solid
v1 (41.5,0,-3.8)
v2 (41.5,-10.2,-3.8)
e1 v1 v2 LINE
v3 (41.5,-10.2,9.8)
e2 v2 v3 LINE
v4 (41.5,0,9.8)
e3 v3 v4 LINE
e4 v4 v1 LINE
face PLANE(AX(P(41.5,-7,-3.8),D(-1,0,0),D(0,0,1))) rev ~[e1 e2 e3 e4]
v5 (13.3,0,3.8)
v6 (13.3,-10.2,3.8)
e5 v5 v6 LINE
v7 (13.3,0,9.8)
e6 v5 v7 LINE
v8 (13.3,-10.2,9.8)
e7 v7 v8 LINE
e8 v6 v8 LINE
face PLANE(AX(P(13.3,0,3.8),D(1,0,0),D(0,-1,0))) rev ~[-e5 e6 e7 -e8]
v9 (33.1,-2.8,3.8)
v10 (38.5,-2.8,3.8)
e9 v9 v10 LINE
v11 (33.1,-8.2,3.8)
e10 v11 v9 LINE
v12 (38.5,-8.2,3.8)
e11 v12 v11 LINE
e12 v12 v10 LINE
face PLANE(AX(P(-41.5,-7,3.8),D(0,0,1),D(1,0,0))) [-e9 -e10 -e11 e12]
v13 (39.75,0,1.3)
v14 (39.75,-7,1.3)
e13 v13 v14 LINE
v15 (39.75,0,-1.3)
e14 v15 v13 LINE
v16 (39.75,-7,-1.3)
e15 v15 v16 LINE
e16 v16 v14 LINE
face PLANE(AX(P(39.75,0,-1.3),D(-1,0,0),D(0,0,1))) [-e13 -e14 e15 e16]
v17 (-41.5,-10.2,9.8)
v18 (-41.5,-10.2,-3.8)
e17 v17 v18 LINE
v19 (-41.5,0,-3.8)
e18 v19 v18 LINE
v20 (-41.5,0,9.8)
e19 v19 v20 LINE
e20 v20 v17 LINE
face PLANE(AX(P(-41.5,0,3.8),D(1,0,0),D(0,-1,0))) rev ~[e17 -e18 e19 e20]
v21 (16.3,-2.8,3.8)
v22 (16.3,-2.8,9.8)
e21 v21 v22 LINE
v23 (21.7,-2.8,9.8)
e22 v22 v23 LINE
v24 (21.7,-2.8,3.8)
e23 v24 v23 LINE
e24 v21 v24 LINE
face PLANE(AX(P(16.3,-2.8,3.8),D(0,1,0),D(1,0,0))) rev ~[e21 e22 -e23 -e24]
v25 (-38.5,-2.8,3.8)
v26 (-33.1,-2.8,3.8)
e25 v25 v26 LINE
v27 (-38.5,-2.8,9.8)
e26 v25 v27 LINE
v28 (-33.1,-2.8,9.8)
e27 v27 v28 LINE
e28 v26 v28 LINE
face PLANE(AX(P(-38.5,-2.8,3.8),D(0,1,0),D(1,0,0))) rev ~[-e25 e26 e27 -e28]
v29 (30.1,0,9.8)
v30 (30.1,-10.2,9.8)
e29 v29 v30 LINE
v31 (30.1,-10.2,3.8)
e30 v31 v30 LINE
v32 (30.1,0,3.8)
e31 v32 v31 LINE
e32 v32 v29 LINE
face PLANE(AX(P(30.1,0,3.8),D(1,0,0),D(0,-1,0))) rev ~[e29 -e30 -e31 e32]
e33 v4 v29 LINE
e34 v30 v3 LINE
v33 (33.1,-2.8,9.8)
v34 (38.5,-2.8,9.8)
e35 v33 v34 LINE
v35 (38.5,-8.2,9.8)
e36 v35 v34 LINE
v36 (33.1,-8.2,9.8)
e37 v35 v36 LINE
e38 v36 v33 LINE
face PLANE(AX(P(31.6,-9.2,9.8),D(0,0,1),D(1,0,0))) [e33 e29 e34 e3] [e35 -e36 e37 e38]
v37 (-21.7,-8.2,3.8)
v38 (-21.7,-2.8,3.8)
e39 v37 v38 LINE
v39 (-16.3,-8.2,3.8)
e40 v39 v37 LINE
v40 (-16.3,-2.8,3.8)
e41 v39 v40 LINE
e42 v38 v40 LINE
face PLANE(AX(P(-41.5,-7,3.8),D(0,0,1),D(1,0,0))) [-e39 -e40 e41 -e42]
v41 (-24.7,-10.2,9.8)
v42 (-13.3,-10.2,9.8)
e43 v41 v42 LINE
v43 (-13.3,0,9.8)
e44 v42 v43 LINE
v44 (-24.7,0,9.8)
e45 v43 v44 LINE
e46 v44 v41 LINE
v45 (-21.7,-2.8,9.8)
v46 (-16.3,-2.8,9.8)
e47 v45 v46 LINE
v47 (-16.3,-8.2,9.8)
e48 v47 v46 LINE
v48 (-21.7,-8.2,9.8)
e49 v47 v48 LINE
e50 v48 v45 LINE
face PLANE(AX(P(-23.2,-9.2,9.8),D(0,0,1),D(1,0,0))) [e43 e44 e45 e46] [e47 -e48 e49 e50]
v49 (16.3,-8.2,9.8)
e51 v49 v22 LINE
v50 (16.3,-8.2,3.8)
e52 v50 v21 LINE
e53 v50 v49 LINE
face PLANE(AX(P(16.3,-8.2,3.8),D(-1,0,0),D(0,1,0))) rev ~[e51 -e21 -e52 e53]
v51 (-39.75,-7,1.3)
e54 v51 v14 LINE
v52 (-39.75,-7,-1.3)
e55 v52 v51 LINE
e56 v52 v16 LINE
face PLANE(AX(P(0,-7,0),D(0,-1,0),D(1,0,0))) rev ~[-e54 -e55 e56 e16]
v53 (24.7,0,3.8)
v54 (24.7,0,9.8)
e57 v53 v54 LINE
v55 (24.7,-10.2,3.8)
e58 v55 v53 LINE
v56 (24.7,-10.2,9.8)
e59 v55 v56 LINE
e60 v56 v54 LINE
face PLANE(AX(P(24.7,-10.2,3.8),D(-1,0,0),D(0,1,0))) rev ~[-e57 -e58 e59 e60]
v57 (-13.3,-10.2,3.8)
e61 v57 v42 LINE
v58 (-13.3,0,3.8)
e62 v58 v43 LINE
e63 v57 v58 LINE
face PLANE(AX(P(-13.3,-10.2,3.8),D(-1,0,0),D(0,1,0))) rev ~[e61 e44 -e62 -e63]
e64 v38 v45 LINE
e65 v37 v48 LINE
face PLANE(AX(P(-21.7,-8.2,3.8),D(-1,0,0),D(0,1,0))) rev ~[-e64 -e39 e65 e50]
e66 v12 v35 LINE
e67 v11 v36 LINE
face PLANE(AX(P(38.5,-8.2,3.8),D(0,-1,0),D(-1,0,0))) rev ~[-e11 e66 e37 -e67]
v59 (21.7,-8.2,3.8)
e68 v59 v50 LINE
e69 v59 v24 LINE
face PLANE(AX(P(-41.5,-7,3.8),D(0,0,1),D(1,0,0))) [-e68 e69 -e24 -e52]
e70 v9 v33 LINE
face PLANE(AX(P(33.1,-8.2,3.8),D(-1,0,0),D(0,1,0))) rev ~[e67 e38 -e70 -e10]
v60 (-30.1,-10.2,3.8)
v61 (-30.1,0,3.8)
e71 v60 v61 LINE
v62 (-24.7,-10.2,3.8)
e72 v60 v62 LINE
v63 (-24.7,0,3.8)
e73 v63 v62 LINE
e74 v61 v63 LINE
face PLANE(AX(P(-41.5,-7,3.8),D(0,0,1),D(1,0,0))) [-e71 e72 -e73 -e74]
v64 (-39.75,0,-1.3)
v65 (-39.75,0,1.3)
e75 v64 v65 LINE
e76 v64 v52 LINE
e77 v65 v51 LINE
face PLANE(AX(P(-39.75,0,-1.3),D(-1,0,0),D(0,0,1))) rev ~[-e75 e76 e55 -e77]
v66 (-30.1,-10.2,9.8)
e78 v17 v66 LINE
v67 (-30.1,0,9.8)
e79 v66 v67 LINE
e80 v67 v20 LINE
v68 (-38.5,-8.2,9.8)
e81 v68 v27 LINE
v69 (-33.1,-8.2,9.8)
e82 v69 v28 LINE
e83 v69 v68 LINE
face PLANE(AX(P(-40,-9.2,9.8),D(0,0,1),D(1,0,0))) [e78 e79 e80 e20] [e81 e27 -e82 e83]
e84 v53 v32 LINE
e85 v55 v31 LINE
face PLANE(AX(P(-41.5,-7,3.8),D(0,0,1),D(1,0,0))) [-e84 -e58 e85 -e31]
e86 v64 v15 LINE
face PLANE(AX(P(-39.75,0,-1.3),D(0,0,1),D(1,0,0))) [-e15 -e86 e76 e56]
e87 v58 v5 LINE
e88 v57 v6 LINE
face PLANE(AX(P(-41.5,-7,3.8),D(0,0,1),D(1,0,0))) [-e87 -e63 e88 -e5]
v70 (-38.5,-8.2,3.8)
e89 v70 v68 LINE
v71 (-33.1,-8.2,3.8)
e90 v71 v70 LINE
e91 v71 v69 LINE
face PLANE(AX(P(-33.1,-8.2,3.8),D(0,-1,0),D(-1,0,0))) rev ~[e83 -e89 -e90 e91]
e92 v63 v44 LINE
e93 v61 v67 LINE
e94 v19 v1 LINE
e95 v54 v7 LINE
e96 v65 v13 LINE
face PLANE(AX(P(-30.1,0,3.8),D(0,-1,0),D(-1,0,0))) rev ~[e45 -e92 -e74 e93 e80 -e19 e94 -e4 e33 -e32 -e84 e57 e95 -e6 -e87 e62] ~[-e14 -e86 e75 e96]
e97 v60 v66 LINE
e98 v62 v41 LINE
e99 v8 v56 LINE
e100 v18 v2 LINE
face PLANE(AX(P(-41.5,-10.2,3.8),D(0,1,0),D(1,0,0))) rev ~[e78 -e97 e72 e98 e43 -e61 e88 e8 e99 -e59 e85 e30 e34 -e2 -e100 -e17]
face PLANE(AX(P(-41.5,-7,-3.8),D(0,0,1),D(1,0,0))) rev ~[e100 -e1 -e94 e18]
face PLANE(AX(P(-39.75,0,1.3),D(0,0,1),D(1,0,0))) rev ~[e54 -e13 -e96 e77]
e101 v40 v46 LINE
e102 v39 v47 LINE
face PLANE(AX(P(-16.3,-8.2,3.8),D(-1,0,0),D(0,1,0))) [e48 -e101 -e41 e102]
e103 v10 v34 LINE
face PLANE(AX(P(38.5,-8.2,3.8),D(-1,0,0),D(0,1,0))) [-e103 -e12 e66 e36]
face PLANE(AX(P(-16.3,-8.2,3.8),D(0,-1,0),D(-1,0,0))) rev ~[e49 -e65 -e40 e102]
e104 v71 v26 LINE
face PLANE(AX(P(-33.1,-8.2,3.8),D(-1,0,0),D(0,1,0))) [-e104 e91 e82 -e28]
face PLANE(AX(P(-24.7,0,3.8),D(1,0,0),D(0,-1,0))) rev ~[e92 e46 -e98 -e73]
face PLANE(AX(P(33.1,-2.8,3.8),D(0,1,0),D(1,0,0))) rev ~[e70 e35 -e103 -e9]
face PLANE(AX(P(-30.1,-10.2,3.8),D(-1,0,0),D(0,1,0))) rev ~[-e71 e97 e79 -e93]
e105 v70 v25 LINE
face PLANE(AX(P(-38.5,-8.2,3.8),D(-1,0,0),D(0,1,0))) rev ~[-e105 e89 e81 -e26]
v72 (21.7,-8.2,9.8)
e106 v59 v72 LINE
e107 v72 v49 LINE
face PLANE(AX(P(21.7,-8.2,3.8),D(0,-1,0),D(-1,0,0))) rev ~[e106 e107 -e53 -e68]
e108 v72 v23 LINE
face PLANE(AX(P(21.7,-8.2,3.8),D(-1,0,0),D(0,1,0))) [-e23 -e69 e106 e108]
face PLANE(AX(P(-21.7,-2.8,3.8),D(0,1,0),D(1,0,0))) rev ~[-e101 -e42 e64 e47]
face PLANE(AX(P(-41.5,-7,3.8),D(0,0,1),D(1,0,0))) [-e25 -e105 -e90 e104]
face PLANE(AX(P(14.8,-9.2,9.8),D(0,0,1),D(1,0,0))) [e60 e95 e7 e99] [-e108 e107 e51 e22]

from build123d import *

# Parameters (mm, degrees)
F0_W     = 83
F0_H     = 7.6
F0_W_2   = 79.5
F0_H_2   = 2.6
F1_DEPTH = 7
F2_W     = 83
F2_H     = 7.6
F2_W_2   = 79.5
F2_H_2   = 2.6
F3_DEPTH = 3.2
F4_W     = 3
F4_H     = 2
F4_W_2   = 5.4
F4_H_2   = 5.4
F4_H_3   = 2.8
F5_DEPTH = 6


with BuildPart() as f1:
    # F0 (on Front) → F1 (new body)
    with BuildSketch(Plane.XZ):
        Rectangle(F0_W, F0_H)
        Rectangle(F0_W_2, F0_H_2, mode=Mode.SUBTRACT)
    extrude(amount=F1_DEPTH)

    # F2 (on face) → F3 (join)
    with BuildSketch(Plane.XZ.offset(7)):
        Rectangle(F2_W, F2_H)
        Rectangle(F2_W_2, F2_H_2, mode=Mode.SUBTRACT)
        Rectangle(F2_W_2, F2_H_2)
    extrude(amount=F3_DEPTH)

    # F4 (on face) → F5 (join)
    with BuildSketch(Plane.XY.offset(3.8)):
        with Locations((-40, -9.2)):
            Rectangle(F4_W, F4_H)
        with Locations((-35.8, -9.2)):
            Rectangle(F4_W_2, F4_H)
        with Locations((-40, -5.5)):
            Rectangle(F4_W, F4_H_2)
        with Locations((-31.6, -9.2)):
            Rectangle(F4_W, F4_H)
        with Locations((-40, -1.4)):
            Rectangle(F4_W, F4_H_3)
        with Locations((-31.6, -5.5)):
            Rectangle(F4_W, F4_H_2)
        with Locations((-35.8, -1.4)):
            Rectangle(F4_W_2, F4_H_3)
        with Locations((-23.2, -9.2)):
            Rectangle(F4_W, F4_H)
        with Locations((-31.6, -1.4)):
            Rectangle(F4_W, F4_H_3)
        with Locations((-19, -9.2)):
            Rectangle(F4_W_2, F4_H)
        with Locations((-23.2, -5.5)):
            Rectangle(F4_W, F4_H_2)
        with Locations((-14.8, -9.2)):
            Rectangle(F4_W, F4_H)
        with Locations((-23.2, -1.4)):
            Rectangle(F4_W, F4_H_3)
        with Locations((-14.8, -5.5)):
            Rectangle(F4_W, F4_H_2)
        with Locations((-19, -1.4)):
            Rectangle(F4_W_2, F4_H_3)
        with Locations((-14.8, -1.4)):
            Rectangle(F4_W, F4_H_3)
        with Locations((14.8, -9.2)):
            Rectangle(F4_W, F4_H)
        with Locations((19, -9.2)):
            Rectangle(F4_W_2, F4_H)
        with Locations((14.8, -5.5)):
            Rectangle(F4_W, F4_H_2)
        with Locations((23.2, -9.2)):
            Rectangle(F4_W, F4_H)
        with Locations((14.8, -1.4)):
            Rectangle(F4_W, F4_H_3)
        with Locations((23.2, -5.5)):
            Rectangle(F4_W, F4_H_2)
        with Locations((19, -1.4)):
            Rectangle(F4_W_2, F4_H_3)
        with Locations((31.6, -9.2)):
            Rectangle(F4_W, F4_H)
        with Locations((23.2, -1.4)):
            Rectangle(F4_W, F4_H_3)
        with Locations((35.8, -9.2)):
            Rectangle(F4_W_2, F4_H)
        with Locations((31.6, -5.5)):
            Rectangle(F4_W, F4_H_2)
        with Locations((40, -9.2)):
            Rectangle(F4_W, F4_H)
        with Locations((31.6, -1.4)):
            Rectangle(F4_W, F4_H_3)
        with Locations((40, -5.5)):
            Rectangle(F4_W, F4_H_2)
        with Locations((35.8, -1.4)):
            Rectangle(F4_W_2, F4_H_3)
        with Locations((40, -1.4)):
            Rectangle(F4_W, F4_H_3)
    extrude(amount=F5_DEPTH)


solid = f1.part
